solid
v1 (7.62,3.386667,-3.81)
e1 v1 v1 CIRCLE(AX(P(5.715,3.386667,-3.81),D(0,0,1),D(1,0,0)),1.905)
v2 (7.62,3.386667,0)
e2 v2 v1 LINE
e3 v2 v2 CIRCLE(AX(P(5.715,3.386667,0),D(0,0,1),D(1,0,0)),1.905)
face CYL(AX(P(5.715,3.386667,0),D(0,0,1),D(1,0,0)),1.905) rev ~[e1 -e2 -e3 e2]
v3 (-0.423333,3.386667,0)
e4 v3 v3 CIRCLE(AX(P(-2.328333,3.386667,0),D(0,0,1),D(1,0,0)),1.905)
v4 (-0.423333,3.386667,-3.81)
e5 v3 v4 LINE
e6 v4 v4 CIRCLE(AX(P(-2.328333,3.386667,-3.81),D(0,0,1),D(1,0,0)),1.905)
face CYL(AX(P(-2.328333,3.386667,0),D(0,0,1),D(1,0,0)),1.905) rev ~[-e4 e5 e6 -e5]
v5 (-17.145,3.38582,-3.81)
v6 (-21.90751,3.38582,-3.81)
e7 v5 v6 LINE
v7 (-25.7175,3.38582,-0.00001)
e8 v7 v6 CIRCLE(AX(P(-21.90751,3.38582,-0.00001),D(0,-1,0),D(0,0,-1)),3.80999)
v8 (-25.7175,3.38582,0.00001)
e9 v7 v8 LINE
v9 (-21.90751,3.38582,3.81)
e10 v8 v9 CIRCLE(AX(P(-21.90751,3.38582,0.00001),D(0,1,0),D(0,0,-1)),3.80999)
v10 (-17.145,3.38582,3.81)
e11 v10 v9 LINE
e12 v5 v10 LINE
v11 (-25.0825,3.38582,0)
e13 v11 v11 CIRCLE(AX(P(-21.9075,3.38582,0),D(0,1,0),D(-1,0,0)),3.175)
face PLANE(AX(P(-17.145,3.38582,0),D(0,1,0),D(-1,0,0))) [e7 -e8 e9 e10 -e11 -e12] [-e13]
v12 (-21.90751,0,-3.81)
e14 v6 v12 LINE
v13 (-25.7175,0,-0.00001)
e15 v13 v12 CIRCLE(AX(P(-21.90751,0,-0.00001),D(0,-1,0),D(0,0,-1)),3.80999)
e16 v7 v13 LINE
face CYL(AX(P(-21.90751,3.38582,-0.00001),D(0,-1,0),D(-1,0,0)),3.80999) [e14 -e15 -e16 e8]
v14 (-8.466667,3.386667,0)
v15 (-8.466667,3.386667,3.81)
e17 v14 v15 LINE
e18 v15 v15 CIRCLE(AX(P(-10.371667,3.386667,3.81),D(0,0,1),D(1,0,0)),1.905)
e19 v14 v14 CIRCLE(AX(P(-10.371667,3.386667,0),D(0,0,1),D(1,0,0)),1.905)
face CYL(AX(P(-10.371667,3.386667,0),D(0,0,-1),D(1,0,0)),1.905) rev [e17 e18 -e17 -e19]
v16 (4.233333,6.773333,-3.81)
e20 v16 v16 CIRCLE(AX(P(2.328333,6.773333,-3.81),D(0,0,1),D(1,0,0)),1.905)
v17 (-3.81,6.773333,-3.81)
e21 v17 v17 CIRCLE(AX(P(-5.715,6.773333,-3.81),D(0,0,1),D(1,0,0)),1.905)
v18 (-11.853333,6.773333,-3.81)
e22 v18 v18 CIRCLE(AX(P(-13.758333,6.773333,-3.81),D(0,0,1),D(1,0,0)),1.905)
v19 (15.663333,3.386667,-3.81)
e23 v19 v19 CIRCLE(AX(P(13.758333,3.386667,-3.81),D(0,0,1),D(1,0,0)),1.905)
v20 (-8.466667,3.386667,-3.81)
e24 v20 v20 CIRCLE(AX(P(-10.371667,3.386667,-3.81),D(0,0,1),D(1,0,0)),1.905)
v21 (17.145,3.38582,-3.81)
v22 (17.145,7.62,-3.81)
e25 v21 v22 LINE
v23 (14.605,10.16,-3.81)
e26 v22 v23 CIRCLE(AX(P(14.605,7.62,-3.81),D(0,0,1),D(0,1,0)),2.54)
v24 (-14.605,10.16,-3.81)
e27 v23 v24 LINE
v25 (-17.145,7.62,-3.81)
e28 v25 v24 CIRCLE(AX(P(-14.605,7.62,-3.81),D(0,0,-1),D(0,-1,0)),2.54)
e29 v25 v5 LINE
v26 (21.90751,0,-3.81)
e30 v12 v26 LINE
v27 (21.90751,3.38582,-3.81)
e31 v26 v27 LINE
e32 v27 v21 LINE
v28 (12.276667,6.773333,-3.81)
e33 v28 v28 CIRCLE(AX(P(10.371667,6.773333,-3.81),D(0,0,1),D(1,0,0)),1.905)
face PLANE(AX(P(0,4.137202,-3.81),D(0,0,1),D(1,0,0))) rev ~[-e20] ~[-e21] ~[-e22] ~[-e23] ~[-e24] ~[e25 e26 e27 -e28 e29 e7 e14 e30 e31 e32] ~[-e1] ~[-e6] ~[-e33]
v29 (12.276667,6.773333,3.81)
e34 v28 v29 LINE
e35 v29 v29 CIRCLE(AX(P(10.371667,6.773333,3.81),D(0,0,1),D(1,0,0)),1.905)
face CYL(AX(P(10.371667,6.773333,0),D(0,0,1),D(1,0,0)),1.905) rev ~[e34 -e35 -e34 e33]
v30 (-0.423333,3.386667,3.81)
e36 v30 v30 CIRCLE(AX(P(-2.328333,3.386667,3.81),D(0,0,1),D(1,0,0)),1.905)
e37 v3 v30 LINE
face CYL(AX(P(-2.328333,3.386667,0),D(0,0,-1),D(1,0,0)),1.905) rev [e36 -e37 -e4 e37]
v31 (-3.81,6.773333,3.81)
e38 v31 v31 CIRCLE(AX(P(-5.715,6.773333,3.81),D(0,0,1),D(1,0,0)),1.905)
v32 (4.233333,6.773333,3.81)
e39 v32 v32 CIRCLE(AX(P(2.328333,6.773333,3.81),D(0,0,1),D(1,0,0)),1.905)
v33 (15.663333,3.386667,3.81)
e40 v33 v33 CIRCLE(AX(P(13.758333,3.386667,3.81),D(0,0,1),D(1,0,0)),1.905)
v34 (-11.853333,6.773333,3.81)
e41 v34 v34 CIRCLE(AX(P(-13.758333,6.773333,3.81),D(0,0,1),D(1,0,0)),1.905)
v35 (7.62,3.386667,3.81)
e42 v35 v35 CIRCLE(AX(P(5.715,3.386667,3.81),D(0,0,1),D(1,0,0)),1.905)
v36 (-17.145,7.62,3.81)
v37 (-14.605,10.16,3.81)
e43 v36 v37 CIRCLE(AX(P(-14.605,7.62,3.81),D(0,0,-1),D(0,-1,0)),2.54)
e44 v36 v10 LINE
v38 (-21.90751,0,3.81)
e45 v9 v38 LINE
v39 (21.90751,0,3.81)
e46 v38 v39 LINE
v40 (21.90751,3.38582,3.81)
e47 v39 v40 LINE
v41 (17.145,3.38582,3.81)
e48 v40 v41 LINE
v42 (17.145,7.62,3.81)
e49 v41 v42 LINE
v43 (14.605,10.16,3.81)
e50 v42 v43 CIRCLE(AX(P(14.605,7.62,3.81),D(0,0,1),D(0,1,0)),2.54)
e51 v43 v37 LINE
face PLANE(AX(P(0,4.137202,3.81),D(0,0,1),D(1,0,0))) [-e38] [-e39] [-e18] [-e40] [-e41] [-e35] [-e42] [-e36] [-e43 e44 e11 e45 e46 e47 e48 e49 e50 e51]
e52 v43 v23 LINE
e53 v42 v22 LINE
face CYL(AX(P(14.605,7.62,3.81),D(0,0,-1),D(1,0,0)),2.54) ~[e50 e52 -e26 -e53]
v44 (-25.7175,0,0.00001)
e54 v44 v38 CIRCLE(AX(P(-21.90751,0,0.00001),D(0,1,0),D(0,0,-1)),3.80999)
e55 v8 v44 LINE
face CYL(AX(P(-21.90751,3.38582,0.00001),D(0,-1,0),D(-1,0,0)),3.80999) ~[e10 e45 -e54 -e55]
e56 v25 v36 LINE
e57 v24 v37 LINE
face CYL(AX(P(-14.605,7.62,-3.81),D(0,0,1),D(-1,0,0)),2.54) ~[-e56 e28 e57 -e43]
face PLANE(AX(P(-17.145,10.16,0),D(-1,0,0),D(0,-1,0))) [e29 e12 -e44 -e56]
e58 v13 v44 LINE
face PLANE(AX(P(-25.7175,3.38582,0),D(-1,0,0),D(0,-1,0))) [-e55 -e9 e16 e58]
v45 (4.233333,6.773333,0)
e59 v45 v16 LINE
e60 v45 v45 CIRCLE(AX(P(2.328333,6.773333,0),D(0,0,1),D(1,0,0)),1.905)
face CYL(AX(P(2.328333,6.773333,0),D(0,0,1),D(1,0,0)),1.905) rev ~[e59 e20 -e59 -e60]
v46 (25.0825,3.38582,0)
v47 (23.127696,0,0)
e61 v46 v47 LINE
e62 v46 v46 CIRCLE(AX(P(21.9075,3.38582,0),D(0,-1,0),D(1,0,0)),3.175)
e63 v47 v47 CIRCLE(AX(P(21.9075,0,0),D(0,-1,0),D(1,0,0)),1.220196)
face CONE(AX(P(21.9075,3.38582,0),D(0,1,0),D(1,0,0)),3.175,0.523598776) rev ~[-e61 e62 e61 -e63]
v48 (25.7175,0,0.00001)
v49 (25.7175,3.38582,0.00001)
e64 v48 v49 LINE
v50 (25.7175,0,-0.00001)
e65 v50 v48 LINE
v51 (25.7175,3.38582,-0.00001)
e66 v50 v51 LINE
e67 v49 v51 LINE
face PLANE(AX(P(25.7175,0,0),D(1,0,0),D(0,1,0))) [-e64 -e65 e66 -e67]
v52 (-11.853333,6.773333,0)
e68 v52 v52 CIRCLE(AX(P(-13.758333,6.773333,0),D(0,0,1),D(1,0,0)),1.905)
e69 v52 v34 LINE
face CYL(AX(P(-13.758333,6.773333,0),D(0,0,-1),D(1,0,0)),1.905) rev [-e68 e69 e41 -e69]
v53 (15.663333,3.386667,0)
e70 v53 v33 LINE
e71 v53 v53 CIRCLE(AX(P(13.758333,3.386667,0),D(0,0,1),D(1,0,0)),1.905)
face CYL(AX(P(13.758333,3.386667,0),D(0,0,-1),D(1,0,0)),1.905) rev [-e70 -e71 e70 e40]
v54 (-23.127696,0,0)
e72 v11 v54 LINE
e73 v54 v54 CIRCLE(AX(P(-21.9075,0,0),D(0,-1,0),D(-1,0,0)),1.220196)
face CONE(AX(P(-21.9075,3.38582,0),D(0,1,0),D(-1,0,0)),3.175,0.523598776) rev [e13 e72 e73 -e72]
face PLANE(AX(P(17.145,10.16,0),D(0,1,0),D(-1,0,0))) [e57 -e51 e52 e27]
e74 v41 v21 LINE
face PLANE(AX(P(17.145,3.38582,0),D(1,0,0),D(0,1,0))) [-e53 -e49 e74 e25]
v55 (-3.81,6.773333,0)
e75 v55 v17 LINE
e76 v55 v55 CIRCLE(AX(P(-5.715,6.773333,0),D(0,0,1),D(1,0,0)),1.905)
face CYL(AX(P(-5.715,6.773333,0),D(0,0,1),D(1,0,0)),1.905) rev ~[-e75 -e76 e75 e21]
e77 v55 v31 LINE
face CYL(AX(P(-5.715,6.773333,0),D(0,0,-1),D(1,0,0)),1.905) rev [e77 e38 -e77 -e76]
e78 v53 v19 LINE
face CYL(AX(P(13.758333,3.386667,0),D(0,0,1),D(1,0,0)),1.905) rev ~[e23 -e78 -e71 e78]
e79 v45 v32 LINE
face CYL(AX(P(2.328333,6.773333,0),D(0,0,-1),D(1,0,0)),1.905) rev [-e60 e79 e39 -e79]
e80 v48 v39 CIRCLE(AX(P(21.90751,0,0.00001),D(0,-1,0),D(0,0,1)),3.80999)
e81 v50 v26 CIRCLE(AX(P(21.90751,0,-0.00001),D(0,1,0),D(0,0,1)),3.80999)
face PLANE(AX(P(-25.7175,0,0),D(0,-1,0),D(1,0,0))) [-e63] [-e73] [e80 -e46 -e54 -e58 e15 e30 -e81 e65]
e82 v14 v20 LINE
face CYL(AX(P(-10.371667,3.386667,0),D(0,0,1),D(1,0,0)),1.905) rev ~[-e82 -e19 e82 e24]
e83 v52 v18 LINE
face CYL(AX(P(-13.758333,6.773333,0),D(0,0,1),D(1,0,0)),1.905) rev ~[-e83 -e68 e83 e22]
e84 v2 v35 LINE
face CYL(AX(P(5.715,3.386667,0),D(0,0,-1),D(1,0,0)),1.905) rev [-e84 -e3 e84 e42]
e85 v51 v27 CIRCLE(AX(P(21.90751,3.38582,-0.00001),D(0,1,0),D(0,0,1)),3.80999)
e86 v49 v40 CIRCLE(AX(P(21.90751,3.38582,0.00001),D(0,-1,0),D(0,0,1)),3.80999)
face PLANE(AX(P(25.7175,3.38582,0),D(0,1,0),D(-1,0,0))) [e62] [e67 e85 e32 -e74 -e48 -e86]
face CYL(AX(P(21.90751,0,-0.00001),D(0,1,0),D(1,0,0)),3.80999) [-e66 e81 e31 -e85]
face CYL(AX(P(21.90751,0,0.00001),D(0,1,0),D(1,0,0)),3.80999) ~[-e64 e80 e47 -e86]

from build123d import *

# Parameters (mm, degrees)
F1_DEPTH = 3.81
F3_R     = 3.80999
F4_R     = 2.54
F2_R     = 1.905
F5_DEPTH = 3.81


# Not quite as in the source:
# - a fillet or chamfer is up to 0.001 mm smaller than in the source, because OpenCascade refuses the exact size
# - a pattern or mirror of a feature is missing from the dataset's text; its kind, count and spacing are read off the source's solid


with BuildPart() as f1:
    # F0 (on Top) → F1 (new body, symmetric)
    with BuildSketch(Plane.XY):
        Polygon((17.145, 10.16), (0, 10.16), (-17.145, 10.16), (-17.145, 3.38582), (-25.7175, 3.38582), (-25.7175, 0), (0, 0), (25.7175, 0), (25.7175, 3.38582), (17.145, 3.38582), align=None)
    extrude(amount=F1_DEPTH, both=True)

    # F3 (radius 3.81 in the source; OpenCascade refuses exactly that, so slightly less here)
    f3_edges = [f1.edges().sort_by_distance(p)[0] for p in [
        (-25.7175, 1.69291, 3.81),
        (-25.7175, 1.69291, -3.81),
        (25.7175, 1.69291, 3.81),
        (25.7175, 1.69291, -3.81),
    ]]
    fillet(f3_edges, radius=F3_R)

    # F4
    f4_edges = [f1.edges().sort_by_distance(p)[0] for p in [
        (-17.145, 10.16, 0),
        (17.145, 10.16, 0),
    ]]
    fillet(f4_edges, radius=F4_R)

    # F2 (on Top) → F5 (cut, symmetric)
    with BuildSketch(Plane.XY):
        with Locations((-13.7583333333, 6.7733333333)):
            Circle(F2_R)
        with Locations((-10.3716666667, 3.3866666667)):
            Circle(F2_R)
        with Locations((-2.3283333333, 3.3866666667)):
            Circle(F2_R)
        with Locations((-5.715, 6.7733333333)):
            Circle(F2_R)
        with Locations((5.715, 3.3866666667)):
            Circle(F2_R)
        with Locations((2.3283333333, 6.7733333333)):
            Circle(F2_R)
        with Locations((13.7583333333, 3.3866666667)):
            Circle(F2_R)
        with Locations((10.3716666667, 6.7733333333)):
            Circle(F2_R)
    extrude(amount=F5_DEPTH, both=True, mode=Mode.SUBTRACT)

    # F6 (on Top) → F7 (revolve, cut)
    with BuildSketch(Plane.XY):
        Polygon((-21.9075, -2.113441314), (-21.9075, 3.38582), (-25.0825, 3.38582), align=None)
    f7 = revolve(axis=Axis((-21.9075, 0.636189343, 0), (0, 1, 0)), mode=Mode.SUBTRACT)

    # F7_copies: F7 across plane
    add(f7.mirror(Plane(origin=(0, 0, 0), x_dir=(0, 0, 1), z_dir=(1, 0, 0))), mode=Mode.SUBTRACT)


solid = f1.part
